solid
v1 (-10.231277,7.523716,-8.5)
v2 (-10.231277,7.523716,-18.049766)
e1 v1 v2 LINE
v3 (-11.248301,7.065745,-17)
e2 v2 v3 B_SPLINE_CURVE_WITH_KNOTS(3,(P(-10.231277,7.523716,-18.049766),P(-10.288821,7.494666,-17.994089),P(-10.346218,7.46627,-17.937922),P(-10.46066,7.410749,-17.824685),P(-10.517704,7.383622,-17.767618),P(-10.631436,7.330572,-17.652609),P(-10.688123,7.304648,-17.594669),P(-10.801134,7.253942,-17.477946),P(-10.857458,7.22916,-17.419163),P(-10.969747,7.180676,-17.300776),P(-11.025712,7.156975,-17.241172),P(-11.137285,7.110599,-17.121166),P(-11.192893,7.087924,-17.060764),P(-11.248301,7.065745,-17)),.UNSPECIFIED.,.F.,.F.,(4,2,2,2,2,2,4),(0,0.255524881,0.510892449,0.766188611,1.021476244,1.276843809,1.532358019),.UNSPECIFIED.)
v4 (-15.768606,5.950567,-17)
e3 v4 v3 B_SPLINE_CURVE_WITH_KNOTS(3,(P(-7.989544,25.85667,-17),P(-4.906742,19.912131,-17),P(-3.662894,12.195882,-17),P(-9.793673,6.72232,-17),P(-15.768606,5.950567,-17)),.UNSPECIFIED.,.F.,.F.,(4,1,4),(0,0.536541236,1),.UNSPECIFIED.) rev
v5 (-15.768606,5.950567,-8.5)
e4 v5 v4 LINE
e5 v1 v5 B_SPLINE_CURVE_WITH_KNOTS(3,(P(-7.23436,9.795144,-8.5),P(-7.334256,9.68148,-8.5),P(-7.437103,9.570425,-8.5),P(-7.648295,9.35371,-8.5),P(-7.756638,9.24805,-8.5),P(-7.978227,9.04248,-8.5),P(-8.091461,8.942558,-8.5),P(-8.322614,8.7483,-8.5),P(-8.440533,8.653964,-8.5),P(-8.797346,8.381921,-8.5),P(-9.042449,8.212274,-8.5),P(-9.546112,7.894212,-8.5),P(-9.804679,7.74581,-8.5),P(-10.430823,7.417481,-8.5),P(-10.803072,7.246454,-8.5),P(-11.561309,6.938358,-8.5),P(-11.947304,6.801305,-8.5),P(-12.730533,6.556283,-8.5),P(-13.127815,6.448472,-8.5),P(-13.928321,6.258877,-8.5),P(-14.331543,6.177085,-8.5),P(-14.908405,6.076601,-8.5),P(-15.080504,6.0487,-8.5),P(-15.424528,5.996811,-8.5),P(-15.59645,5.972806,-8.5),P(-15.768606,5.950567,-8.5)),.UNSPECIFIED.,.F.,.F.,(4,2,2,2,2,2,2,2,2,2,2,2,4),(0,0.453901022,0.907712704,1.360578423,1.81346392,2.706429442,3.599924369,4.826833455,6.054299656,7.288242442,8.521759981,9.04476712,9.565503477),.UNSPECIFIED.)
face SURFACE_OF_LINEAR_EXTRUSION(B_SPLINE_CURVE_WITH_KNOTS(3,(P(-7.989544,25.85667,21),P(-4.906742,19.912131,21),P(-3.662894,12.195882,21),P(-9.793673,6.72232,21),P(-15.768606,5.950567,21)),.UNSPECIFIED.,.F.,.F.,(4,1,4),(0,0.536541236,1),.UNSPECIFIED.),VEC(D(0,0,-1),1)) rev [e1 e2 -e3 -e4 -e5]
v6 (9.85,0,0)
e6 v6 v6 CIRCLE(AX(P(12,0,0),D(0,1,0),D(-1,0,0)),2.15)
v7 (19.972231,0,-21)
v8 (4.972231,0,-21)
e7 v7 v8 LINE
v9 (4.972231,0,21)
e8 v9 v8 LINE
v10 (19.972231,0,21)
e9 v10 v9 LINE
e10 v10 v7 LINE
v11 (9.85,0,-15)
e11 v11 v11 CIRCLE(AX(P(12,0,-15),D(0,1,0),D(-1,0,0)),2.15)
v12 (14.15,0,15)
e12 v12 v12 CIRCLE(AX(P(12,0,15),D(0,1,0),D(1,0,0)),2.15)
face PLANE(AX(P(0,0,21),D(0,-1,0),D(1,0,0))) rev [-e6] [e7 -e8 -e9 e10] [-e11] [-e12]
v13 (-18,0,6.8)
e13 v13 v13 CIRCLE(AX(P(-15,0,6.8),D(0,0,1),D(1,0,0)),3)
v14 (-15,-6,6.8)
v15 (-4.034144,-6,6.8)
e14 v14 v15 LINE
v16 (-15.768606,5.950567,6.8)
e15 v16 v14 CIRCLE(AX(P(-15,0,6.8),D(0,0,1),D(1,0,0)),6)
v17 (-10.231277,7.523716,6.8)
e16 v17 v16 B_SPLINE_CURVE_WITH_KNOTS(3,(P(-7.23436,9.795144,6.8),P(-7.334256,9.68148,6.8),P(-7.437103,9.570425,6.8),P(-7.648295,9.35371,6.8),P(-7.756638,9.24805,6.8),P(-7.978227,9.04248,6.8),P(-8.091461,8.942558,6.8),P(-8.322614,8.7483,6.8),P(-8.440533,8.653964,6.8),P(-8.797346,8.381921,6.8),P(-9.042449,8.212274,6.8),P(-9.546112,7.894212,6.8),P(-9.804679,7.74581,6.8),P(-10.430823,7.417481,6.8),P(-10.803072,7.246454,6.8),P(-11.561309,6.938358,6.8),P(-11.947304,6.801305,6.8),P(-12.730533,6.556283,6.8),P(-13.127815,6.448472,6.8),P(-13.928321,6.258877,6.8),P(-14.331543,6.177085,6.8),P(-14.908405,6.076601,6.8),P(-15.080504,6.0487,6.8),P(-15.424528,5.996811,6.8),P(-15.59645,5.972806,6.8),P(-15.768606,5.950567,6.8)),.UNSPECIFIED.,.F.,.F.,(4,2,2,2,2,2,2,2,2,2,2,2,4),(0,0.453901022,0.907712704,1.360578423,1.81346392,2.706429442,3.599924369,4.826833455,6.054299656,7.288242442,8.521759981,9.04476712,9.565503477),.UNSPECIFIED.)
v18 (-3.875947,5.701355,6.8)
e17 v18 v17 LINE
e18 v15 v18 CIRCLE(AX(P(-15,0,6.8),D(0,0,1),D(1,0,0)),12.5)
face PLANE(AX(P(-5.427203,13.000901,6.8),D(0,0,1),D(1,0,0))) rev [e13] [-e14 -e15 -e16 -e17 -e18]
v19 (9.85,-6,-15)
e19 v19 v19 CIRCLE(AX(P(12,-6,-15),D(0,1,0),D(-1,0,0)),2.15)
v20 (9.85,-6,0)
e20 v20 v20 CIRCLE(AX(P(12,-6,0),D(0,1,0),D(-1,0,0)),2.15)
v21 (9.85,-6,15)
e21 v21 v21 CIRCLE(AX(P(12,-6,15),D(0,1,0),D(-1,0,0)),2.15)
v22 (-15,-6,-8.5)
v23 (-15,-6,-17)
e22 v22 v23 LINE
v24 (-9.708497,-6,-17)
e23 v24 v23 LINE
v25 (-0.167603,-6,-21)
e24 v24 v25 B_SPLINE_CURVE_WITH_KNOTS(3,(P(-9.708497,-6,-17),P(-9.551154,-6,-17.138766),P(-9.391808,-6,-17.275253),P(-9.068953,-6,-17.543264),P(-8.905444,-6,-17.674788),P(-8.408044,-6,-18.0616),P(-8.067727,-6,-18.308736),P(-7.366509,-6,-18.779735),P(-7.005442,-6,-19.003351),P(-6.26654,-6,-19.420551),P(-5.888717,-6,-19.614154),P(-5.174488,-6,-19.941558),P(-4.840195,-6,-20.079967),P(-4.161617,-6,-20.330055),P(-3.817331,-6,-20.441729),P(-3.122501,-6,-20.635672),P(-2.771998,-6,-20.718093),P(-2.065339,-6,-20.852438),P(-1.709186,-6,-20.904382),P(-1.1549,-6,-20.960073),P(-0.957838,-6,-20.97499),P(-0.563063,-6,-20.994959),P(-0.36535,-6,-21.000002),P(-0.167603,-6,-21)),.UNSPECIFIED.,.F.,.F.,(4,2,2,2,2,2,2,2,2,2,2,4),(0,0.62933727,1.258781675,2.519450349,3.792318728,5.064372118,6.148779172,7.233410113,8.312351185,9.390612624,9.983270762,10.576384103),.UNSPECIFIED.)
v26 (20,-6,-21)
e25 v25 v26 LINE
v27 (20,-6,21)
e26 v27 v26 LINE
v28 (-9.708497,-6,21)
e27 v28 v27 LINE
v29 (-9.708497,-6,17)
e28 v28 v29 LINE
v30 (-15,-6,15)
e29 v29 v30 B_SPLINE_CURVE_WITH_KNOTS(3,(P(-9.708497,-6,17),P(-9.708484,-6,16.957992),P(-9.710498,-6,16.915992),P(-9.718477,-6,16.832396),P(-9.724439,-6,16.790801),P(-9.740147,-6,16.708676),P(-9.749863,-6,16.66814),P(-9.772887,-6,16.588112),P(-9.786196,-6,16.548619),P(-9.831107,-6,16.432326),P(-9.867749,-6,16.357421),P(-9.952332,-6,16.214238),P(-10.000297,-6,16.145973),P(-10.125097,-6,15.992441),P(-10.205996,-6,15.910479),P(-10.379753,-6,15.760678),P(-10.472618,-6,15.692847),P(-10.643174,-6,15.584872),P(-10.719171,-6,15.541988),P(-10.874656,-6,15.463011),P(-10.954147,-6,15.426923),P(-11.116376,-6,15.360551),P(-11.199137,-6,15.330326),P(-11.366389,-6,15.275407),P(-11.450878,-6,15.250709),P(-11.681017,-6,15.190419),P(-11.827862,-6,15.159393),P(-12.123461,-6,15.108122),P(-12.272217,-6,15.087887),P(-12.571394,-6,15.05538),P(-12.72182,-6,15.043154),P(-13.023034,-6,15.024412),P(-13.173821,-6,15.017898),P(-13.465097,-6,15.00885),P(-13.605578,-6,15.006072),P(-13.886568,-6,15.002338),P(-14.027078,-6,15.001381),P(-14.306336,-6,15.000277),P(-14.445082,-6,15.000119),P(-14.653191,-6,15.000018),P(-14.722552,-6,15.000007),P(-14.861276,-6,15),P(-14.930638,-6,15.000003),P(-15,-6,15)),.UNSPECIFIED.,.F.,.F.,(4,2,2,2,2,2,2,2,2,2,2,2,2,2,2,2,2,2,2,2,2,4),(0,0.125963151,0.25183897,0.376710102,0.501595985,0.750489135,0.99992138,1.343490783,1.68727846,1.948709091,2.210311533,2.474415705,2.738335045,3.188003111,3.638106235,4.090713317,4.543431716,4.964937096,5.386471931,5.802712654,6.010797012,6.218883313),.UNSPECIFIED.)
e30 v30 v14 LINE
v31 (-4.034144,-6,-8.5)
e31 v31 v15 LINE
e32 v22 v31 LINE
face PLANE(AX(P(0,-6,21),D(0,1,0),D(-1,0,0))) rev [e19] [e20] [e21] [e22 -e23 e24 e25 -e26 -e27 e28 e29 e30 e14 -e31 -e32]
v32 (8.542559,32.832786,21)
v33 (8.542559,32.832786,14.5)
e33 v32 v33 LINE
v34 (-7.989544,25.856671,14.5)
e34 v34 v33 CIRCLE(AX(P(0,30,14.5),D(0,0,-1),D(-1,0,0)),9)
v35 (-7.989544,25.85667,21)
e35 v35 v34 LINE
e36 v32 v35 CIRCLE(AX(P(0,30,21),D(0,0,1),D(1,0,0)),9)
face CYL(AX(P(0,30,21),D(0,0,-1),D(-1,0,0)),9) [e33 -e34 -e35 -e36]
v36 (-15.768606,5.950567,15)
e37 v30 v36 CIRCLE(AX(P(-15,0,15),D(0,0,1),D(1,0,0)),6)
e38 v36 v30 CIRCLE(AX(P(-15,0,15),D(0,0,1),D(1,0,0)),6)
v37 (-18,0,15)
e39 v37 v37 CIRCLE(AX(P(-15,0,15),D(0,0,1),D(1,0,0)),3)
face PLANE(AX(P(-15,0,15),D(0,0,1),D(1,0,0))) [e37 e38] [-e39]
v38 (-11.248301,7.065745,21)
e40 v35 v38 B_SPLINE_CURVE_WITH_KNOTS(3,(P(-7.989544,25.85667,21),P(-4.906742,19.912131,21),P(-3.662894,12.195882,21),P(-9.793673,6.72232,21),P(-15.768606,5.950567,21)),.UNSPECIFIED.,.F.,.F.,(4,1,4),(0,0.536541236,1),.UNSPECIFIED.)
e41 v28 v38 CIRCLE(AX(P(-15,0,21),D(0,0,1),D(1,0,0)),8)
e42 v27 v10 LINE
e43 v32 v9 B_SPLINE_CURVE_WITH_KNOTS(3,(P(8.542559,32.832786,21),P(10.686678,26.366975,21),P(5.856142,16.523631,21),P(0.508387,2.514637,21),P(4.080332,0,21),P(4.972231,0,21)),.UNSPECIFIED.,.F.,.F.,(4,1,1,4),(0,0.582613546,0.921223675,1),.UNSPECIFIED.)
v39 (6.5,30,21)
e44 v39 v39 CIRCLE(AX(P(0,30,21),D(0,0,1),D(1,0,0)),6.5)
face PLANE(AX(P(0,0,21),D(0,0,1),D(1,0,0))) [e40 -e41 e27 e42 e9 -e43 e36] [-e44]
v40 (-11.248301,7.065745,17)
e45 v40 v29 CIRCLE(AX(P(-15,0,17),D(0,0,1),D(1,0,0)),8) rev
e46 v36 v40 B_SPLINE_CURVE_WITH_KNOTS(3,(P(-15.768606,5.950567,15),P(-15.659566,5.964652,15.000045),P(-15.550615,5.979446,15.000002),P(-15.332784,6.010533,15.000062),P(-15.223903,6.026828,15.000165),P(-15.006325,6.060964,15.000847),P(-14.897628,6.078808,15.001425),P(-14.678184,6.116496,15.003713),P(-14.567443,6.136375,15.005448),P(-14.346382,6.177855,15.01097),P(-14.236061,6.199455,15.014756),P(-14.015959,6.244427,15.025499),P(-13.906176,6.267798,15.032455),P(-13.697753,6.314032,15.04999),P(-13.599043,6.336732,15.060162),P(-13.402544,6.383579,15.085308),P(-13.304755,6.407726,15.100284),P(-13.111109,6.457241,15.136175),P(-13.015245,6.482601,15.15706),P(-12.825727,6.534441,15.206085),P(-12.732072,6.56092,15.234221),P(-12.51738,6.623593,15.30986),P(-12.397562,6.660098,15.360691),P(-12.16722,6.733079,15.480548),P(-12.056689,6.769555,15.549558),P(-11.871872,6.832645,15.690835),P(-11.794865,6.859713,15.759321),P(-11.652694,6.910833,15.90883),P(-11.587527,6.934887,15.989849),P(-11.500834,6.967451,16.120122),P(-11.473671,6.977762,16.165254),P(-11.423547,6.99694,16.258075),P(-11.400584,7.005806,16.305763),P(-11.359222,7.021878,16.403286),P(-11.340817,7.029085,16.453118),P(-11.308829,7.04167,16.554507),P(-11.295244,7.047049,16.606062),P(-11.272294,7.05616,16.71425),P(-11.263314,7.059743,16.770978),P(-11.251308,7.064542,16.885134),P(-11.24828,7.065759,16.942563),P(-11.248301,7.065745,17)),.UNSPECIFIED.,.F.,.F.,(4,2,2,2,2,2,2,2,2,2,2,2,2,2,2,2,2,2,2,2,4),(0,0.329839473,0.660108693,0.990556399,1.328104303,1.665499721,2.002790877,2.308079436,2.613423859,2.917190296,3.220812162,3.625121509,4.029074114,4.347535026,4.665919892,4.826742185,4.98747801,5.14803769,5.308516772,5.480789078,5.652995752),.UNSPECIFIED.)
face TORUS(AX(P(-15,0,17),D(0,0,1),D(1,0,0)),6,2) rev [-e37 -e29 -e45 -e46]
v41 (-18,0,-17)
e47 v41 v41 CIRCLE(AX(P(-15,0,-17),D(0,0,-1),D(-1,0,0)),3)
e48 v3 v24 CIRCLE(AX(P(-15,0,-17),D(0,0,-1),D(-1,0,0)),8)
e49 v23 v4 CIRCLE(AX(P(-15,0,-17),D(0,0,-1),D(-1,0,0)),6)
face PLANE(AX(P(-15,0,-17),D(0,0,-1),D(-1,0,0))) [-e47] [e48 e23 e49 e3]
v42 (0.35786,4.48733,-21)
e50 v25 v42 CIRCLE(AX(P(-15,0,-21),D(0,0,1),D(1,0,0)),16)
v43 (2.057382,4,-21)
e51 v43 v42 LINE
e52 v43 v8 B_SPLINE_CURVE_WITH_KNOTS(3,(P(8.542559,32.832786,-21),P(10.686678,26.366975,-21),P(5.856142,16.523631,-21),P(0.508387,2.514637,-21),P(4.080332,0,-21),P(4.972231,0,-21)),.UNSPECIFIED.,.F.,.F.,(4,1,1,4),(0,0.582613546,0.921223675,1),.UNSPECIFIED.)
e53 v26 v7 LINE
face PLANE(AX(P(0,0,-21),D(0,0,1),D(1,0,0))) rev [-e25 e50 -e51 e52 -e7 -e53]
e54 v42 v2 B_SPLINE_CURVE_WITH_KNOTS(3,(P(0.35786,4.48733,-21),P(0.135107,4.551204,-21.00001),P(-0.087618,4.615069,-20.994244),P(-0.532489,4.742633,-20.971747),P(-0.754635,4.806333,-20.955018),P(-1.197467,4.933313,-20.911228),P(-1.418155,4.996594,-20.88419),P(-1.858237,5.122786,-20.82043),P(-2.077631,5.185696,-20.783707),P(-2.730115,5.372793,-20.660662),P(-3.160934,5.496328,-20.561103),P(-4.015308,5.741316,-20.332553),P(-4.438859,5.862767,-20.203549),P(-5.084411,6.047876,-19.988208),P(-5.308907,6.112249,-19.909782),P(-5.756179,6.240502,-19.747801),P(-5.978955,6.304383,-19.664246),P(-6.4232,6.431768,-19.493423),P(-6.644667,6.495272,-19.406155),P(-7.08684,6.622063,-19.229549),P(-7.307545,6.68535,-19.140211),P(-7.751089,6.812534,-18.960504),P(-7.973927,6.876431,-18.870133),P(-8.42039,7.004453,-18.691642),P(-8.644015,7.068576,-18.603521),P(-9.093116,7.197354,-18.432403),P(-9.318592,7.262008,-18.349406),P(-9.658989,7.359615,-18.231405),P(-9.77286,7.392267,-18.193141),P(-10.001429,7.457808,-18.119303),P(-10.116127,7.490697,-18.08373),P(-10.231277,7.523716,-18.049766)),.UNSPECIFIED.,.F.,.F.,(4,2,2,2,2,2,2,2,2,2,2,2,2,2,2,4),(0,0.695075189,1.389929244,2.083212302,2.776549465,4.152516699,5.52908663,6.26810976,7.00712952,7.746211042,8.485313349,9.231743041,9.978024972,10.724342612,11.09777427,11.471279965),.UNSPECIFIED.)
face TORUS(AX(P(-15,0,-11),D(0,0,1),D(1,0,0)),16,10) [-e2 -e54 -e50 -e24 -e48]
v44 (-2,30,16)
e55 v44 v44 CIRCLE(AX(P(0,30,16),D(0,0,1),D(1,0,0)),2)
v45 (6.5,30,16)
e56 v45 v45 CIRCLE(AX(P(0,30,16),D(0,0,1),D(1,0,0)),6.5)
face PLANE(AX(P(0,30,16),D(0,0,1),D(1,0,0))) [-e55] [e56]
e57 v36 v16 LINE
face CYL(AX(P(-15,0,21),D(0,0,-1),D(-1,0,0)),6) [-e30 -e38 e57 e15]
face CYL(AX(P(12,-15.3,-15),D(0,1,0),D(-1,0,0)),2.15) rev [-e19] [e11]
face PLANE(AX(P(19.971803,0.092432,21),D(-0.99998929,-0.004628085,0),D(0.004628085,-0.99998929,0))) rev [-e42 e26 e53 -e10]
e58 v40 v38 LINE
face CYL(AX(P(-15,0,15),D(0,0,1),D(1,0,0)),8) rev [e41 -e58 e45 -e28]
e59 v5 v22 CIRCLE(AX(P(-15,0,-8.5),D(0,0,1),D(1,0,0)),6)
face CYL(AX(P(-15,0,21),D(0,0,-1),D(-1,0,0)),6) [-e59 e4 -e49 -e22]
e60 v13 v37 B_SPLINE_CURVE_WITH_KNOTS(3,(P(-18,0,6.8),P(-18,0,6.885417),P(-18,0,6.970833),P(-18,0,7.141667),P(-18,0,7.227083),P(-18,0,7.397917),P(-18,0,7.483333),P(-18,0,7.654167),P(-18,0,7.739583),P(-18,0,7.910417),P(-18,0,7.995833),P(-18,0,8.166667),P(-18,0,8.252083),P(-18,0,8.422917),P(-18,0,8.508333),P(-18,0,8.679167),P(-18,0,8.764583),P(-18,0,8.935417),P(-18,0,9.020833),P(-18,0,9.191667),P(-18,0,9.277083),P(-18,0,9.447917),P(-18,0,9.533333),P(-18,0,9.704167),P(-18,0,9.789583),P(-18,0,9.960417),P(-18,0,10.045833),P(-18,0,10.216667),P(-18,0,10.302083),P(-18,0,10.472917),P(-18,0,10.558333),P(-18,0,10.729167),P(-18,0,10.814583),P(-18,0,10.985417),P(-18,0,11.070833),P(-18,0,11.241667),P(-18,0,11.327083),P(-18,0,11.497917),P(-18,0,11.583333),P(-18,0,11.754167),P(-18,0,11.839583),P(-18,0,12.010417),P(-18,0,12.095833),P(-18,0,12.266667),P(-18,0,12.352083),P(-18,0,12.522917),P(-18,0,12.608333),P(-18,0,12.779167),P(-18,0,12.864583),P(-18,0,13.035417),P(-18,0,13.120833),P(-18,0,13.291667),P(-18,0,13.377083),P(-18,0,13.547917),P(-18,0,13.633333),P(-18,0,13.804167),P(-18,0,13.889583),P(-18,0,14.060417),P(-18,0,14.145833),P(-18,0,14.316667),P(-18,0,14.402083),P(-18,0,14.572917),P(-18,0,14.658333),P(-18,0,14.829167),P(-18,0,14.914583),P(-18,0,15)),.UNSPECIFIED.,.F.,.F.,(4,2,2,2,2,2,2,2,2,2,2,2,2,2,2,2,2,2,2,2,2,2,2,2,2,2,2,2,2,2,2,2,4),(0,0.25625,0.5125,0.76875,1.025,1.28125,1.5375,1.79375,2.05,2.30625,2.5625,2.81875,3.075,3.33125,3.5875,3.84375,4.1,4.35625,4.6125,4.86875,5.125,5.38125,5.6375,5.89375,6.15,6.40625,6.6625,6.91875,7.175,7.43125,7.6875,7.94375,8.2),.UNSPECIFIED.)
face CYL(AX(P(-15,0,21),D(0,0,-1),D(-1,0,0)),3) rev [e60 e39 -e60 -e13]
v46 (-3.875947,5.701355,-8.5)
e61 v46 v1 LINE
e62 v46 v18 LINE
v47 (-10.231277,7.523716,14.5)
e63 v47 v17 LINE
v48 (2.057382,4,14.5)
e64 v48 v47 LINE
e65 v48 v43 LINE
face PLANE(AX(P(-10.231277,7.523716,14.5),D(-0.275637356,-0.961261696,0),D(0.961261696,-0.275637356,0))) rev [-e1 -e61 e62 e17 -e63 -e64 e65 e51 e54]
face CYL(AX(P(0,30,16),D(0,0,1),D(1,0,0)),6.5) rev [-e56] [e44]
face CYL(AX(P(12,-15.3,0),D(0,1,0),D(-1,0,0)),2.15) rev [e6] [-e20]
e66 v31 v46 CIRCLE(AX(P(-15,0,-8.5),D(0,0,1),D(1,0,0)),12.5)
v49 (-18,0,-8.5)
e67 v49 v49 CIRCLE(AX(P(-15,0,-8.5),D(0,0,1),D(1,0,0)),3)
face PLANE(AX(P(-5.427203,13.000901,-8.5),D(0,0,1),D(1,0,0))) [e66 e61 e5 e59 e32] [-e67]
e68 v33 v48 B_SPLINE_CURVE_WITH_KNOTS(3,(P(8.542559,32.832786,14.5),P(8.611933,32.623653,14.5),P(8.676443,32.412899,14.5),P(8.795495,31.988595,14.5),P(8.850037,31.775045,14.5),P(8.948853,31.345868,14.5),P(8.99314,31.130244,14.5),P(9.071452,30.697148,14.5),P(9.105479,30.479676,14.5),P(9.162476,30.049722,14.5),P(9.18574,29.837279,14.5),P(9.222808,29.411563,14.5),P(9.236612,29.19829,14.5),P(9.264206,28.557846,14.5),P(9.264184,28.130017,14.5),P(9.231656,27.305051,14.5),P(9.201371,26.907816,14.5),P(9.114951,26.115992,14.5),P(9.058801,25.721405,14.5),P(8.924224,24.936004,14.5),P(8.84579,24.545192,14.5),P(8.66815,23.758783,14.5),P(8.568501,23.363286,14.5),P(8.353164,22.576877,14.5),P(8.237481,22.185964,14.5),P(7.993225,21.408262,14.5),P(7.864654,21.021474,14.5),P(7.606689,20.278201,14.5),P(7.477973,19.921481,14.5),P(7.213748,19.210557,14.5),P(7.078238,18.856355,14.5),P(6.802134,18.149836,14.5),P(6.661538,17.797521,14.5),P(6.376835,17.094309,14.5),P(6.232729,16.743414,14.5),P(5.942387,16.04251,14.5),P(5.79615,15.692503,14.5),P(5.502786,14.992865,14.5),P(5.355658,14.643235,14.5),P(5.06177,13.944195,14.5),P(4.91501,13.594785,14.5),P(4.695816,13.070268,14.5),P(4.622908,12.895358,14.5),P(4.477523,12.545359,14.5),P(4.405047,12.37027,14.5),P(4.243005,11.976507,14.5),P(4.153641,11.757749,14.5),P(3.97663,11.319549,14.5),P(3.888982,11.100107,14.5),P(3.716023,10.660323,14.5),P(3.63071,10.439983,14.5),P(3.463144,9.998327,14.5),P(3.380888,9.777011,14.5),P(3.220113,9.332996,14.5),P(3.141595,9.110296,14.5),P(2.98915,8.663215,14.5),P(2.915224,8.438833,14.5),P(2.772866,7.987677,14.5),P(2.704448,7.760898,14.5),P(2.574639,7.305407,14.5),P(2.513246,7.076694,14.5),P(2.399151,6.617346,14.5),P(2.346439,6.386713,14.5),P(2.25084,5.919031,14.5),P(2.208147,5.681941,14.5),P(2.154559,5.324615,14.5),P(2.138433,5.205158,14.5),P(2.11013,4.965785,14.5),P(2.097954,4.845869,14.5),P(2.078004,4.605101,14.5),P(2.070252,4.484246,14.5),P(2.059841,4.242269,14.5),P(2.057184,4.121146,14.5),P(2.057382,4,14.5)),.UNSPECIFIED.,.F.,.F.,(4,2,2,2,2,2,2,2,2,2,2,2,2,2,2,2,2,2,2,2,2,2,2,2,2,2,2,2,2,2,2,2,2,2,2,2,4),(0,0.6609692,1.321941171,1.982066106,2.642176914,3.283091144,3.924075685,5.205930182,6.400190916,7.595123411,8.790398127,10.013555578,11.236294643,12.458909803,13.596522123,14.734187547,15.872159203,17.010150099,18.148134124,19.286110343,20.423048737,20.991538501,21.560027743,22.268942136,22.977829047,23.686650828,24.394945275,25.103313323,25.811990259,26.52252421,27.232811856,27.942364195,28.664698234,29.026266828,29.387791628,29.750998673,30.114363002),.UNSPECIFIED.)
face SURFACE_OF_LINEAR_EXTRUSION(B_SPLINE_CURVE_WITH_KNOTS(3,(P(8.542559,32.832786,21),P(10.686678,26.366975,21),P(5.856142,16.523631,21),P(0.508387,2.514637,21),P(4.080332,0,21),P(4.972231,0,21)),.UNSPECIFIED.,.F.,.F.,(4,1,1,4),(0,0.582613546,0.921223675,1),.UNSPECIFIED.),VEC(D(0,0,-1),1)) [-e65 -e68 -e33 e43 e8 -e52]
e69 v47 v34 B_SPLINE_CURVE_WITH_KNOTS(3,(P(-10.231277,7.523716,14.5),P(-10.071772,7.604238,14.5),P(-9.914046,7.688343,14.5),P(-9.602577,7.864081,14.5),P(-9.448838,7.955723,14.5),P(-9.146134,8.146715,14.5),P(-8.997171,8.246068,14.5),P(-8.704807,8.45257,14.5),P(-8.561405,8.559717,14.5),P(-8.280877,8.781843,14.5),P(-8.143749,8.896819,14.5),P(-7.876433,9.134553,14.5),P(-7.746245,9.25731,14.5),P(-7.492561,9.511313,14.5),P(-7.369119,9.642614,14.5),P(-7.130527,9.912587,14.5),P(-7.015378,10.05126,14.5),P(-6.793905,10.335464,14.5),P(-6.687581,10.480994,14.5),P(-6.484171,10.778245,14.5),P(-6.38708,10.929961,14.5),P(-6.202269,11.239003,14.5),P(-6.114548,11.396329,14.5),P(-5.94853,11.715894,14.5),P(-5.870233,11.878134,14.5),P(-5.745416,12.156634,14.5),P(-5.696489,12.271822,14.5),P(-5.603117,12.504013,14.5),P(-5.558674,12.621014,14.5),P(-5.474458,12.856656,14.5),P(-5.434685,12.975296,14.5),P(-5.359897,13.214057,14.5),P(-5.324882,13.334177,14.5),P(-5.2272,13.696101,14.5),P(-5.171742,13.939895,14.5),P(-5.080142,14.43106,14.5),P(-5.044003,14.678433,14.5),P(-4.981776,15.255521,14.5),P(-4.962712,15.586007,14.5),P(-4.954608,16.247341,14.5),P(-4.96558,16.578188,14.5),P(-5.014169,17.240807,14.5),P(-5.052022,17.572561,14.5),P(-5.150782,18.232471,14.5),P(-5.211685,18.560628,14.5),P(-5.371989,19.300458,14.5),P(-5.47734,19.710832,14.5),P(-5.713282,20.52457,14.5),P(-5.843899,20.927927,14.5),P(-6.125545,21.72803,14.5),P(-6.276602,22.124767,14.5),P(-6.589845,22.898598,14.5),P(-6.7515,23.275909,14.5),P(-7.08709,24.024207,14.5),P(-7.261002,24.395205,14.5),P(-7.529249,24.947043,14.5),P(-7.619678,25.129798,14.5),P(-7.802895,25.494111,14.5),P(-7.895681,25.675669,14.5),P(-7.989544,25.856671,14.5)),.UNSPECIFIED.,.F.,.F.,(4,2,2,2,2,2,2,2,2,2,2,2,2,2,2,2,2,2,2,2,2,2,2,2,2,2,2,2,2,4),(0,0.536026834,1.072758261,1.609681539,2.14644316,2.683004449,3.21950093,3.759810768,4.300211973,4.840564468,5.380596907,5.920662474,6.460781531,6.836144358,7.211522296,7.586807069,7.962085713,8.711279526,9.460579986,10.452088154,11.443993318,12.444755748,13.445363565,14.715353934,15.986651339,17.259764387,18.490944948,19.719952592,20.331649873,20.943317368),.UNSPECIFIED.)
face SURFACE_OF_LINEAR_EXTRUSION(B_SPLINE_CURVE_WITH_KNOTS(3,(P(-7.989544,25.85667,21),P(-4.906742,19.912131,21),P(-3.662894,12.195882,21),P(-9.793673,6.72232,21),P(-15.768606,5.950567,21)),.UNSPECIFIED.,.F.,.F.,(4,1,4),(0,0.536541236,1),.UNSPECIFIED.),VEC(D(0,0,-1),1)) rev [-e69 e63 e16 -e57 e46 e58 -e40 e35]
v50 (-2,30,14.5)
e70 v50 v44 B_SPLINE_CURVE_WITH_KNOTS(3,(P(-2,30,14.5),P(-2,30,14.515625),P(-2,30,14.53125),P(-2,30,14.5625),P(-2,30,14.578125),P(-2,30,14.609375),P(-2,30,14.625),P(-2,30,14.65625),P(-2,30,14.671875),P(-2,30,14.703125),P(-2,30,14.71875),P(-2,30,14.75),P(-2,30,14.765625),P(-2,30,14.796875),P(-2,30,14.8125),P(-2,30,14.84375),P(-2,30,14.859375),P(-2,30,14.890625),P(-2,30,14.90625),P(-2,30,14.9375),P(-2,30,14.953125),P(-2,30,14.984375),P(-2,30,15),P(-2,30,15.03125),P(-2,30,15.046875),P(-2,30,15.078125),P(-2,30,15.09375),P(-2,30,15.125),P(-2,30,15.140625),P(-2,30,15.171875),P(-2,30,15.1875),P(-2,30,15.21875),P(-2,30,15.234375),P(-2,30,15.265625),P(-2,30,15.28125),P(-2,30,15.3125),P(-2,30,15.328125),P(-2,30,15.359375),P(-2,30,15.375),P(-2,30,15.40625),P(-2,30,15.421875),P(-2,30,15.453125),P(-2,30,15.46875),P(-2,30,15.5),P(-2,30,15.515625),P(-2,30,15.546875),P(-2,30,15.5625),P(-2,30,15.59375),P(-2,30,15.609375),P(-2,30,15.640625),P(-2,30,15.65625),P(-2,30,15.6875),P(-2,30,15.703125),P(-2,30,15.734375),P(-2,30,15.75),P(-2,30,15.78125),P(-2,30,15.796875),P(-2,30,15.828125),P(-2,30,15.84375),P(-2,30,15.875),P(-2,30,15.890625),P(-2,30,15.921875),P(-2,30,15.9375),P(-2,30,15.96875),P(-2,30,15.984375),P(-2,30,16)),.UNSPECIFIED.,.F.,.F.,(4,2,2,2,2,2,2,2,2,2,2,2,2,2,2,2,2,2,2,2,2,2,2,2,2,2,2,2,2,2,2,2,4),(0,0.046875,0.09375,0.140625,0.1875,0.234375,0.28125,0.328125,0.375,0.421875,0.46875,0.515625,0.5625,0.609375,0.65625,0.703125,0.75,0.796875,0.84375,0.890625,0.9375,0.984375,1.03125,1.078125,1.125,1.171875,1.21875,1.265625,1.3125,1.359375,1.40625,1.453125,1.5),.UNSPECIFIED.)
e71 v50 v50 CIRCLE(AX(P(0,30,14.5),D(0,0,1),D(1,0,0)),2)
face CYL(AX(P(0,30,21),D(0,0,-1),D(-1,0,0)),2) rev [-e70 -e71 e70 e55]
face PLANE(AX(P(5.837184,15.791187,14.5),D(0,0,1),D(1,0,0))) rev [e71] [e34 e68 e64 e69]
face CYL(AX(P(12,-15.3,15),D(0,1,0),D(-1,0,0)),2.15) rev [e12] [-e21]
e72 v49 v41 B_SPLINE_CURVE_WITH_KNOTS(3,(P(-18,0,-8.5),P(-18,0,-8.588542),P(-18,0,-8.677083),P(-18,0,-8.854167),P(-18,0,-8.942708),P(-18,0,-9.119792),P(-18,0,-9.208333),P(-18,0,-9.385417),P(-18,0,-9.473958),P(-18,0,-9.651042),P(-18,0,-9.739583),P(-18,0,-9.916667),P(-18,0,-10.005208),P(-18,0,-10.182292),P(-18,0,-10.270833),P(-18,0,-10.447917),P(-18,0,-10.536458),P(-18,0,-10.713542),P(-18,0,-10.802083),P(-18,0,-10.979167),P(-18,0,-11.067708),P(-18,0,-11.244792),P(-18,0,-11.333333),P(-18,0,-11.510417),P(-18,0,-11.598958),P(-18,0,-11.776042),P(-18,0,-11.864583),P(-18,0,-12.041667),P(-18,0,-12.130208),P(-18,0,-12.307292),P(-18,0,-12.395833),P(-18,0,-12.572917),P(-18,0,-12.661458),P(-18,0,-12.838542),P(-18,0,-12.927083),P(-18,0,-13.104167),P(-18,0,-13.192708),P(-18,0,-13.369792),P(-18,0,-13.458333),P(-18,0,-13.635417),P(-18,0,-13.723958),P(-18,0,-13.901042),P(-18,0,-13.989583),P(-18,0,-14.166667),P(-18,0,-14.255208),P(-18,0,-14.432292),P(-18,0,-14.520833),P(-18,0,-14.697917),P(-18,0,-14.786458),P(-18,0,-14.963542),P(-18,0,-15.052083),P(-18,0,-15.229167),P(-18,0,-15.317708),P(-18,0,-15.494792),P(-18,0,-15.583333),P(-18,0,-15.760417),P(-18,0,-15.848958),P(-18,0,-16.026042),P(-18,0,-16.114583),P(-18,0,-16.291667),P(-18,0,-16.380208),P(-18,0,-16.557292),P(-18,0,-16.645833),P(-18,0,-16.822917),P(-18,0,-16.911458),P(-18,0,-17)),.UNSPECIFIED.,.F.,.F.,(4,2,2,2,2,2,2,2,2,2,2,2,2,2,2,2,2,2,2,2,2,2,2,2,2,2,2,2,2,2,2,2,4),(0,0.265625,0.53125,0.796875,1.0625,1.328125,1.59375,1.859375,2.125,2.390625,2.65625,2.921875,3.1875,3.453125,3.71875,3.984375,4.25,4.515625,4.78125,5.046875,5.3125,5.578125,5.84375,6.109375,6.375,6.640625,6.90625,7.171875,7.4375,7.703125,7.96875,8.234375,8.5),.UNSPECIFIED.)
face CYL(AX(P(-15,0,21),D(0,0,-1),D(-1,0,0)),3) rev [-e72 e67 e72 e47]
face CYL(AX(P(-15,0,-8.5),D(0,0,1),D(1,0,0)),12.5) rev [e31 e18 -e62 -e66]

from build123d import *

# Parameters (mm, degrees)
SKETCH1_R           = 6.5
SKETCH1_R_2         = 3.000000000000001
SKETCH1_R_3         = 2.000000000000001
BOSS_EXTRUDE1_DEPTH = 21
CUT_EXTRUDE1_START  = -35.5
CUT_EXTRUDE1_DEPTH  = 35.5
CUT_EXTRUDE2_START  = -14.2
CUT_EXTRUDE2_DEPTH  = 15.3
SKETCH4_R           = 2.1500000000000012
SKETCH4_R_2         = 2.149999999999999
CUT_EXTRUDE3_DEPTH  = 15.3
SKETCH6_R           = 6.499999999999999
CUT_EXTRUDE4_DEPTH  = 5
SKETCH7_R           = 8.000000000000002
CUT_EXTRUDE5_DEPTH  = 6
CUT_EXTRUDE6_START  = -4
SKETCH8_R           = 8.000000000000002
CUT_EXTRUDE6_DEPTH  = 4
FILLET1_R           = 10
FILLET3_R           = 2


with BuildPart() as part:
    # Sketch1 → Boss-Extrude1 (new, symmetric)
    # profile 1 of 2: a face of its own
    with BuildSketch(Plane.XY):
        with BuildLine():
            add(Edge.make_bspline(
                [(8.542559375854681, 32.832786492130545), (10.686678203257555, 26.366975375458193), (5.856141786689584, 16.523631312439278), (0.5083868378802346, 2.514637421674764), (4.080331624706952, -3.187e-14), (4.9722311918748305, 5.6e-16)],
                knots=[0, 0, 0, 0, 0.5826135462254243, 0.9212236747100581, 1, 1, 1, 1], degree=3))
            Line((4.9722311918748305, 5.6e-16), (19.97223119187482, -6.1e-16))
            Line((19.97223119187482, -6.1e-16), (20.000000000000004, -6.000000000000001))
            Line((20.000000000000004, -6.000000000000001), (-15, -6.000000000000003))
            ThreePointArc((-15, -6.000000000000003), (-20.98762892620649, -0.38509718520825564), (-15.768606348517892, 5.950566719314891))
            add(Edge.make_bspline(
                [(-7.98954445714796, 25.856670497383014), (-4.906742308970248, 19.912131256682922), (-3.6628937282407366, 12.195881997757215), (-9.793673492034818, 6.722320325665471), (-15.768606348517892, 5.950566719314891)],
                knots=[0, 0, 0, 0, 0.5365412355207451, 1, 1, 1, 1], degree=3))
            ThreePointArc((-7.98954445714796, 25.856670497383014), (-3.4990005670363873, 38.29198378145294), (8.542559375854681, 32.832786492130545))
        make_face()
        with Locations((1.388e-14, 30)):
            Circle(SKETCH1_R, mode=Mode.SUBTRACT)
        with Locations(Location((-15, 0, 0), (0, 0, 180))):
            Circle(SKETCH1_R_2, mode=Mode.SUBTRACT)
    # profile 2 of 2: a face of its own
    with BuildSketch(Plane.XY):
        with Locations((1.388e-14, 30)):
            Circle(SKETCH1_R)
        with Locations(Location((1.388e-14, 30, 0), (0, 0, 180))):
            Circle(SKETCH1_R_3, mode=Mode.SUBTRACT)
    extrude(amount=BOSS_EXTRUDE1_DEPTH, both=True)

    # Sketch2 → Cut-Extrude1 (cut)
    with BuildSketch(Plane(origin=(0, 0, -21), x_dir=(-1, 0, 0), z_dir=(0, 0, -1)).offset(CUT_EXTRUDE1_START)):
        with BuildLine():
            Line((10.231277065568076, 7.523716250881215), (-2.057381883744481, 3.999999999999989))
            add(Edge.make_bspline(
                [(-8.542559375854681, 32.832786492130545), (-10.686678203257555, 26.366975375458193), (-6.407471523281442, 17.647094178971816), (-2.0529735437800074, 6.524226588369356), (-2.057381883744481, 3.999999999999989)],
                knots=[0, 0, 0, 0, 0.5826135462254243, 0.8160804851922084, 0.8160804851922084, 0.8160804851922084, 0.8160804851922084], degree=3))
            ThreePointArc((-8.542559375854681, 32.832786492130545), (3.499000567036403, 38.29198378145297), (7.98954445714796, 25.856670497383014))
            add(Edge.make_bspline(
                [(10.231277065568076, 7.523716250881215), (7.863619154783306, 8.719037669732709), (3.881869806613929, 13.55430618913155), (4.906742308970248, 19.912131256682922), (7.98954445714796, 25.856670497383014)],
                knots=[0.17604721488266967, 0.17604721488266967, 0.17604721488266967, 0.17604721488266967, 0.46345876447925494, 1, 1, 1, 1], degree=3))
        make_face()
    extrude(amount=CUT_EXTRUDE1_DEPTH, mode=Mode.SUBTRACT)

    # Sketch3 → Cut-Extrude2 (cut)
    with BuildSketch(Plane.XY.offset(21).offset(CUT_EXTRUDE2_START)):
        with BuildLine():
            Line((-15.000000000000002, -6.000000000000002), (-4.0341439002693456, -6.000000000000003))
            ThreePointArc((-4.0341439002693456, -6.000000000000003), (-2.748923532280786, 2.482161433528555), (-7.234360367683872, 9.795143750910501))
            add(Edge.make_bspline(
                [(-7.234360367683872, 9.795143750910501), (-8.872569061817323, 7.931489713842532), (-11.533359351024282, 6.497613392911335), (-15.768606348517892, 5.950566719314891)],
                knots=[0.6714837826850107, 0.6714837826850107, 0.6714837826850107, 0.6714837826850107, 1, 1, 1, 1], degree=3))
            ThreePointArc((-15.768606348517892, 5.950566719314891), (-20.98762892620649, -0.3850971852082583), (-15.000000000000002, -6.000000000000002))
        make_face()
    extrude(amount=-CUT_EXTRUDE2_DEPTH, mode=Mode.SUBTRACT)

    # Sketch4 → Cut-Extrude3 (cut)
    with BuildSketch(Plane(origin=(0, 0, 0), x_dir=(1, 1.3e-16, 0), z_dir=(-1.3e-16, 1, 0))):
        with Locations(Location((12, 0, 0), (0, 0, 180))):
            Circle(SKETCH4_R)
        with Locations(Location((11.999999999999996, 15, 0), (0, 0, 180))):
            Circle(SKETCH4_R_2)
        with Locations(Location((11.999999999999996, -15, 0), (0, 0, 180))):
            Circle(SKETCH4_R_2)
    extrude(amount=-CUT_EXTRUDE3_DEPTH, mode=Mode.SUBTRACT)

    # Sketch6 → Cut-Extrude4 (cut)
    with BuildSketch(Plane.XY.offset(21)):
        with Locations((1.388e-14, 30)):
            Circle(SKETCH6_R)
    extrude(amount=-CUT_EXTRUDE4_DEPTH, mode=Mode.SUBTRACT)

    # Sketch7 → Cut-Extrude5 (cut)
    with BuildSketch(Plane.XY.offset(21)):
        with Locations((-15, 0)):
            Circle(SKETCH7_R)
    extrude(amount=-CUT_EXTRUDE5_DEPTH, mode=Mode.SUBTRACT)

    # Sketch8 → Cut-Extrude6 (cut)
    with BuildSketch(Plane(origin=(0, 0, -21), x_dir=(-1, 0, 0), z_dir=(0, 0, -1)).offset(CUT_EXTRUDE6_START)):
        with Locations((15, 0)):
            Circle(SKETCH8_R)
    extrude(amount=CUT_EXTRUDE6_DEPTH, mode=Mode.SUBTRACT)

    # Fillet1
    # the kernel refuses this fillet: 10 mm, written as the material it takes off along each edge
    with BuildSketch(Plane(origin=(-15, 0, -21), x_dir=(-0.9934899400699477, -0.11391987965149795, 0), z_dir=(0.11391987965149795, -0.9934899400699477, 0))) as fillet1_piece_1:
        with BuildLine():
            CenterArc((16.000000000000007, -10.000000000000002), FILLET1_R, 90, 53.13010235415598)
            Line((8.000000000000004, -4), (8.000000000000004, 0))
            Line((8.000000000000004, 0), (16.000000000000007, 0))
        make_face()
    revolve(axis=Axis((-15, 0, -21), (0, 0, -1)), revolution_arc=359.6400000000001, mode=Mode.SUBTRACT)

    # Fillet3
    fillet3_edges = [part.edges().sort_by_distance(p)[0] for p in [
        (-7.0549828149653875, 0.9363236243440207, 15),
    ]]
    fillet(fillet3_edges, radius=FILLET3_R)


solid = part.part
